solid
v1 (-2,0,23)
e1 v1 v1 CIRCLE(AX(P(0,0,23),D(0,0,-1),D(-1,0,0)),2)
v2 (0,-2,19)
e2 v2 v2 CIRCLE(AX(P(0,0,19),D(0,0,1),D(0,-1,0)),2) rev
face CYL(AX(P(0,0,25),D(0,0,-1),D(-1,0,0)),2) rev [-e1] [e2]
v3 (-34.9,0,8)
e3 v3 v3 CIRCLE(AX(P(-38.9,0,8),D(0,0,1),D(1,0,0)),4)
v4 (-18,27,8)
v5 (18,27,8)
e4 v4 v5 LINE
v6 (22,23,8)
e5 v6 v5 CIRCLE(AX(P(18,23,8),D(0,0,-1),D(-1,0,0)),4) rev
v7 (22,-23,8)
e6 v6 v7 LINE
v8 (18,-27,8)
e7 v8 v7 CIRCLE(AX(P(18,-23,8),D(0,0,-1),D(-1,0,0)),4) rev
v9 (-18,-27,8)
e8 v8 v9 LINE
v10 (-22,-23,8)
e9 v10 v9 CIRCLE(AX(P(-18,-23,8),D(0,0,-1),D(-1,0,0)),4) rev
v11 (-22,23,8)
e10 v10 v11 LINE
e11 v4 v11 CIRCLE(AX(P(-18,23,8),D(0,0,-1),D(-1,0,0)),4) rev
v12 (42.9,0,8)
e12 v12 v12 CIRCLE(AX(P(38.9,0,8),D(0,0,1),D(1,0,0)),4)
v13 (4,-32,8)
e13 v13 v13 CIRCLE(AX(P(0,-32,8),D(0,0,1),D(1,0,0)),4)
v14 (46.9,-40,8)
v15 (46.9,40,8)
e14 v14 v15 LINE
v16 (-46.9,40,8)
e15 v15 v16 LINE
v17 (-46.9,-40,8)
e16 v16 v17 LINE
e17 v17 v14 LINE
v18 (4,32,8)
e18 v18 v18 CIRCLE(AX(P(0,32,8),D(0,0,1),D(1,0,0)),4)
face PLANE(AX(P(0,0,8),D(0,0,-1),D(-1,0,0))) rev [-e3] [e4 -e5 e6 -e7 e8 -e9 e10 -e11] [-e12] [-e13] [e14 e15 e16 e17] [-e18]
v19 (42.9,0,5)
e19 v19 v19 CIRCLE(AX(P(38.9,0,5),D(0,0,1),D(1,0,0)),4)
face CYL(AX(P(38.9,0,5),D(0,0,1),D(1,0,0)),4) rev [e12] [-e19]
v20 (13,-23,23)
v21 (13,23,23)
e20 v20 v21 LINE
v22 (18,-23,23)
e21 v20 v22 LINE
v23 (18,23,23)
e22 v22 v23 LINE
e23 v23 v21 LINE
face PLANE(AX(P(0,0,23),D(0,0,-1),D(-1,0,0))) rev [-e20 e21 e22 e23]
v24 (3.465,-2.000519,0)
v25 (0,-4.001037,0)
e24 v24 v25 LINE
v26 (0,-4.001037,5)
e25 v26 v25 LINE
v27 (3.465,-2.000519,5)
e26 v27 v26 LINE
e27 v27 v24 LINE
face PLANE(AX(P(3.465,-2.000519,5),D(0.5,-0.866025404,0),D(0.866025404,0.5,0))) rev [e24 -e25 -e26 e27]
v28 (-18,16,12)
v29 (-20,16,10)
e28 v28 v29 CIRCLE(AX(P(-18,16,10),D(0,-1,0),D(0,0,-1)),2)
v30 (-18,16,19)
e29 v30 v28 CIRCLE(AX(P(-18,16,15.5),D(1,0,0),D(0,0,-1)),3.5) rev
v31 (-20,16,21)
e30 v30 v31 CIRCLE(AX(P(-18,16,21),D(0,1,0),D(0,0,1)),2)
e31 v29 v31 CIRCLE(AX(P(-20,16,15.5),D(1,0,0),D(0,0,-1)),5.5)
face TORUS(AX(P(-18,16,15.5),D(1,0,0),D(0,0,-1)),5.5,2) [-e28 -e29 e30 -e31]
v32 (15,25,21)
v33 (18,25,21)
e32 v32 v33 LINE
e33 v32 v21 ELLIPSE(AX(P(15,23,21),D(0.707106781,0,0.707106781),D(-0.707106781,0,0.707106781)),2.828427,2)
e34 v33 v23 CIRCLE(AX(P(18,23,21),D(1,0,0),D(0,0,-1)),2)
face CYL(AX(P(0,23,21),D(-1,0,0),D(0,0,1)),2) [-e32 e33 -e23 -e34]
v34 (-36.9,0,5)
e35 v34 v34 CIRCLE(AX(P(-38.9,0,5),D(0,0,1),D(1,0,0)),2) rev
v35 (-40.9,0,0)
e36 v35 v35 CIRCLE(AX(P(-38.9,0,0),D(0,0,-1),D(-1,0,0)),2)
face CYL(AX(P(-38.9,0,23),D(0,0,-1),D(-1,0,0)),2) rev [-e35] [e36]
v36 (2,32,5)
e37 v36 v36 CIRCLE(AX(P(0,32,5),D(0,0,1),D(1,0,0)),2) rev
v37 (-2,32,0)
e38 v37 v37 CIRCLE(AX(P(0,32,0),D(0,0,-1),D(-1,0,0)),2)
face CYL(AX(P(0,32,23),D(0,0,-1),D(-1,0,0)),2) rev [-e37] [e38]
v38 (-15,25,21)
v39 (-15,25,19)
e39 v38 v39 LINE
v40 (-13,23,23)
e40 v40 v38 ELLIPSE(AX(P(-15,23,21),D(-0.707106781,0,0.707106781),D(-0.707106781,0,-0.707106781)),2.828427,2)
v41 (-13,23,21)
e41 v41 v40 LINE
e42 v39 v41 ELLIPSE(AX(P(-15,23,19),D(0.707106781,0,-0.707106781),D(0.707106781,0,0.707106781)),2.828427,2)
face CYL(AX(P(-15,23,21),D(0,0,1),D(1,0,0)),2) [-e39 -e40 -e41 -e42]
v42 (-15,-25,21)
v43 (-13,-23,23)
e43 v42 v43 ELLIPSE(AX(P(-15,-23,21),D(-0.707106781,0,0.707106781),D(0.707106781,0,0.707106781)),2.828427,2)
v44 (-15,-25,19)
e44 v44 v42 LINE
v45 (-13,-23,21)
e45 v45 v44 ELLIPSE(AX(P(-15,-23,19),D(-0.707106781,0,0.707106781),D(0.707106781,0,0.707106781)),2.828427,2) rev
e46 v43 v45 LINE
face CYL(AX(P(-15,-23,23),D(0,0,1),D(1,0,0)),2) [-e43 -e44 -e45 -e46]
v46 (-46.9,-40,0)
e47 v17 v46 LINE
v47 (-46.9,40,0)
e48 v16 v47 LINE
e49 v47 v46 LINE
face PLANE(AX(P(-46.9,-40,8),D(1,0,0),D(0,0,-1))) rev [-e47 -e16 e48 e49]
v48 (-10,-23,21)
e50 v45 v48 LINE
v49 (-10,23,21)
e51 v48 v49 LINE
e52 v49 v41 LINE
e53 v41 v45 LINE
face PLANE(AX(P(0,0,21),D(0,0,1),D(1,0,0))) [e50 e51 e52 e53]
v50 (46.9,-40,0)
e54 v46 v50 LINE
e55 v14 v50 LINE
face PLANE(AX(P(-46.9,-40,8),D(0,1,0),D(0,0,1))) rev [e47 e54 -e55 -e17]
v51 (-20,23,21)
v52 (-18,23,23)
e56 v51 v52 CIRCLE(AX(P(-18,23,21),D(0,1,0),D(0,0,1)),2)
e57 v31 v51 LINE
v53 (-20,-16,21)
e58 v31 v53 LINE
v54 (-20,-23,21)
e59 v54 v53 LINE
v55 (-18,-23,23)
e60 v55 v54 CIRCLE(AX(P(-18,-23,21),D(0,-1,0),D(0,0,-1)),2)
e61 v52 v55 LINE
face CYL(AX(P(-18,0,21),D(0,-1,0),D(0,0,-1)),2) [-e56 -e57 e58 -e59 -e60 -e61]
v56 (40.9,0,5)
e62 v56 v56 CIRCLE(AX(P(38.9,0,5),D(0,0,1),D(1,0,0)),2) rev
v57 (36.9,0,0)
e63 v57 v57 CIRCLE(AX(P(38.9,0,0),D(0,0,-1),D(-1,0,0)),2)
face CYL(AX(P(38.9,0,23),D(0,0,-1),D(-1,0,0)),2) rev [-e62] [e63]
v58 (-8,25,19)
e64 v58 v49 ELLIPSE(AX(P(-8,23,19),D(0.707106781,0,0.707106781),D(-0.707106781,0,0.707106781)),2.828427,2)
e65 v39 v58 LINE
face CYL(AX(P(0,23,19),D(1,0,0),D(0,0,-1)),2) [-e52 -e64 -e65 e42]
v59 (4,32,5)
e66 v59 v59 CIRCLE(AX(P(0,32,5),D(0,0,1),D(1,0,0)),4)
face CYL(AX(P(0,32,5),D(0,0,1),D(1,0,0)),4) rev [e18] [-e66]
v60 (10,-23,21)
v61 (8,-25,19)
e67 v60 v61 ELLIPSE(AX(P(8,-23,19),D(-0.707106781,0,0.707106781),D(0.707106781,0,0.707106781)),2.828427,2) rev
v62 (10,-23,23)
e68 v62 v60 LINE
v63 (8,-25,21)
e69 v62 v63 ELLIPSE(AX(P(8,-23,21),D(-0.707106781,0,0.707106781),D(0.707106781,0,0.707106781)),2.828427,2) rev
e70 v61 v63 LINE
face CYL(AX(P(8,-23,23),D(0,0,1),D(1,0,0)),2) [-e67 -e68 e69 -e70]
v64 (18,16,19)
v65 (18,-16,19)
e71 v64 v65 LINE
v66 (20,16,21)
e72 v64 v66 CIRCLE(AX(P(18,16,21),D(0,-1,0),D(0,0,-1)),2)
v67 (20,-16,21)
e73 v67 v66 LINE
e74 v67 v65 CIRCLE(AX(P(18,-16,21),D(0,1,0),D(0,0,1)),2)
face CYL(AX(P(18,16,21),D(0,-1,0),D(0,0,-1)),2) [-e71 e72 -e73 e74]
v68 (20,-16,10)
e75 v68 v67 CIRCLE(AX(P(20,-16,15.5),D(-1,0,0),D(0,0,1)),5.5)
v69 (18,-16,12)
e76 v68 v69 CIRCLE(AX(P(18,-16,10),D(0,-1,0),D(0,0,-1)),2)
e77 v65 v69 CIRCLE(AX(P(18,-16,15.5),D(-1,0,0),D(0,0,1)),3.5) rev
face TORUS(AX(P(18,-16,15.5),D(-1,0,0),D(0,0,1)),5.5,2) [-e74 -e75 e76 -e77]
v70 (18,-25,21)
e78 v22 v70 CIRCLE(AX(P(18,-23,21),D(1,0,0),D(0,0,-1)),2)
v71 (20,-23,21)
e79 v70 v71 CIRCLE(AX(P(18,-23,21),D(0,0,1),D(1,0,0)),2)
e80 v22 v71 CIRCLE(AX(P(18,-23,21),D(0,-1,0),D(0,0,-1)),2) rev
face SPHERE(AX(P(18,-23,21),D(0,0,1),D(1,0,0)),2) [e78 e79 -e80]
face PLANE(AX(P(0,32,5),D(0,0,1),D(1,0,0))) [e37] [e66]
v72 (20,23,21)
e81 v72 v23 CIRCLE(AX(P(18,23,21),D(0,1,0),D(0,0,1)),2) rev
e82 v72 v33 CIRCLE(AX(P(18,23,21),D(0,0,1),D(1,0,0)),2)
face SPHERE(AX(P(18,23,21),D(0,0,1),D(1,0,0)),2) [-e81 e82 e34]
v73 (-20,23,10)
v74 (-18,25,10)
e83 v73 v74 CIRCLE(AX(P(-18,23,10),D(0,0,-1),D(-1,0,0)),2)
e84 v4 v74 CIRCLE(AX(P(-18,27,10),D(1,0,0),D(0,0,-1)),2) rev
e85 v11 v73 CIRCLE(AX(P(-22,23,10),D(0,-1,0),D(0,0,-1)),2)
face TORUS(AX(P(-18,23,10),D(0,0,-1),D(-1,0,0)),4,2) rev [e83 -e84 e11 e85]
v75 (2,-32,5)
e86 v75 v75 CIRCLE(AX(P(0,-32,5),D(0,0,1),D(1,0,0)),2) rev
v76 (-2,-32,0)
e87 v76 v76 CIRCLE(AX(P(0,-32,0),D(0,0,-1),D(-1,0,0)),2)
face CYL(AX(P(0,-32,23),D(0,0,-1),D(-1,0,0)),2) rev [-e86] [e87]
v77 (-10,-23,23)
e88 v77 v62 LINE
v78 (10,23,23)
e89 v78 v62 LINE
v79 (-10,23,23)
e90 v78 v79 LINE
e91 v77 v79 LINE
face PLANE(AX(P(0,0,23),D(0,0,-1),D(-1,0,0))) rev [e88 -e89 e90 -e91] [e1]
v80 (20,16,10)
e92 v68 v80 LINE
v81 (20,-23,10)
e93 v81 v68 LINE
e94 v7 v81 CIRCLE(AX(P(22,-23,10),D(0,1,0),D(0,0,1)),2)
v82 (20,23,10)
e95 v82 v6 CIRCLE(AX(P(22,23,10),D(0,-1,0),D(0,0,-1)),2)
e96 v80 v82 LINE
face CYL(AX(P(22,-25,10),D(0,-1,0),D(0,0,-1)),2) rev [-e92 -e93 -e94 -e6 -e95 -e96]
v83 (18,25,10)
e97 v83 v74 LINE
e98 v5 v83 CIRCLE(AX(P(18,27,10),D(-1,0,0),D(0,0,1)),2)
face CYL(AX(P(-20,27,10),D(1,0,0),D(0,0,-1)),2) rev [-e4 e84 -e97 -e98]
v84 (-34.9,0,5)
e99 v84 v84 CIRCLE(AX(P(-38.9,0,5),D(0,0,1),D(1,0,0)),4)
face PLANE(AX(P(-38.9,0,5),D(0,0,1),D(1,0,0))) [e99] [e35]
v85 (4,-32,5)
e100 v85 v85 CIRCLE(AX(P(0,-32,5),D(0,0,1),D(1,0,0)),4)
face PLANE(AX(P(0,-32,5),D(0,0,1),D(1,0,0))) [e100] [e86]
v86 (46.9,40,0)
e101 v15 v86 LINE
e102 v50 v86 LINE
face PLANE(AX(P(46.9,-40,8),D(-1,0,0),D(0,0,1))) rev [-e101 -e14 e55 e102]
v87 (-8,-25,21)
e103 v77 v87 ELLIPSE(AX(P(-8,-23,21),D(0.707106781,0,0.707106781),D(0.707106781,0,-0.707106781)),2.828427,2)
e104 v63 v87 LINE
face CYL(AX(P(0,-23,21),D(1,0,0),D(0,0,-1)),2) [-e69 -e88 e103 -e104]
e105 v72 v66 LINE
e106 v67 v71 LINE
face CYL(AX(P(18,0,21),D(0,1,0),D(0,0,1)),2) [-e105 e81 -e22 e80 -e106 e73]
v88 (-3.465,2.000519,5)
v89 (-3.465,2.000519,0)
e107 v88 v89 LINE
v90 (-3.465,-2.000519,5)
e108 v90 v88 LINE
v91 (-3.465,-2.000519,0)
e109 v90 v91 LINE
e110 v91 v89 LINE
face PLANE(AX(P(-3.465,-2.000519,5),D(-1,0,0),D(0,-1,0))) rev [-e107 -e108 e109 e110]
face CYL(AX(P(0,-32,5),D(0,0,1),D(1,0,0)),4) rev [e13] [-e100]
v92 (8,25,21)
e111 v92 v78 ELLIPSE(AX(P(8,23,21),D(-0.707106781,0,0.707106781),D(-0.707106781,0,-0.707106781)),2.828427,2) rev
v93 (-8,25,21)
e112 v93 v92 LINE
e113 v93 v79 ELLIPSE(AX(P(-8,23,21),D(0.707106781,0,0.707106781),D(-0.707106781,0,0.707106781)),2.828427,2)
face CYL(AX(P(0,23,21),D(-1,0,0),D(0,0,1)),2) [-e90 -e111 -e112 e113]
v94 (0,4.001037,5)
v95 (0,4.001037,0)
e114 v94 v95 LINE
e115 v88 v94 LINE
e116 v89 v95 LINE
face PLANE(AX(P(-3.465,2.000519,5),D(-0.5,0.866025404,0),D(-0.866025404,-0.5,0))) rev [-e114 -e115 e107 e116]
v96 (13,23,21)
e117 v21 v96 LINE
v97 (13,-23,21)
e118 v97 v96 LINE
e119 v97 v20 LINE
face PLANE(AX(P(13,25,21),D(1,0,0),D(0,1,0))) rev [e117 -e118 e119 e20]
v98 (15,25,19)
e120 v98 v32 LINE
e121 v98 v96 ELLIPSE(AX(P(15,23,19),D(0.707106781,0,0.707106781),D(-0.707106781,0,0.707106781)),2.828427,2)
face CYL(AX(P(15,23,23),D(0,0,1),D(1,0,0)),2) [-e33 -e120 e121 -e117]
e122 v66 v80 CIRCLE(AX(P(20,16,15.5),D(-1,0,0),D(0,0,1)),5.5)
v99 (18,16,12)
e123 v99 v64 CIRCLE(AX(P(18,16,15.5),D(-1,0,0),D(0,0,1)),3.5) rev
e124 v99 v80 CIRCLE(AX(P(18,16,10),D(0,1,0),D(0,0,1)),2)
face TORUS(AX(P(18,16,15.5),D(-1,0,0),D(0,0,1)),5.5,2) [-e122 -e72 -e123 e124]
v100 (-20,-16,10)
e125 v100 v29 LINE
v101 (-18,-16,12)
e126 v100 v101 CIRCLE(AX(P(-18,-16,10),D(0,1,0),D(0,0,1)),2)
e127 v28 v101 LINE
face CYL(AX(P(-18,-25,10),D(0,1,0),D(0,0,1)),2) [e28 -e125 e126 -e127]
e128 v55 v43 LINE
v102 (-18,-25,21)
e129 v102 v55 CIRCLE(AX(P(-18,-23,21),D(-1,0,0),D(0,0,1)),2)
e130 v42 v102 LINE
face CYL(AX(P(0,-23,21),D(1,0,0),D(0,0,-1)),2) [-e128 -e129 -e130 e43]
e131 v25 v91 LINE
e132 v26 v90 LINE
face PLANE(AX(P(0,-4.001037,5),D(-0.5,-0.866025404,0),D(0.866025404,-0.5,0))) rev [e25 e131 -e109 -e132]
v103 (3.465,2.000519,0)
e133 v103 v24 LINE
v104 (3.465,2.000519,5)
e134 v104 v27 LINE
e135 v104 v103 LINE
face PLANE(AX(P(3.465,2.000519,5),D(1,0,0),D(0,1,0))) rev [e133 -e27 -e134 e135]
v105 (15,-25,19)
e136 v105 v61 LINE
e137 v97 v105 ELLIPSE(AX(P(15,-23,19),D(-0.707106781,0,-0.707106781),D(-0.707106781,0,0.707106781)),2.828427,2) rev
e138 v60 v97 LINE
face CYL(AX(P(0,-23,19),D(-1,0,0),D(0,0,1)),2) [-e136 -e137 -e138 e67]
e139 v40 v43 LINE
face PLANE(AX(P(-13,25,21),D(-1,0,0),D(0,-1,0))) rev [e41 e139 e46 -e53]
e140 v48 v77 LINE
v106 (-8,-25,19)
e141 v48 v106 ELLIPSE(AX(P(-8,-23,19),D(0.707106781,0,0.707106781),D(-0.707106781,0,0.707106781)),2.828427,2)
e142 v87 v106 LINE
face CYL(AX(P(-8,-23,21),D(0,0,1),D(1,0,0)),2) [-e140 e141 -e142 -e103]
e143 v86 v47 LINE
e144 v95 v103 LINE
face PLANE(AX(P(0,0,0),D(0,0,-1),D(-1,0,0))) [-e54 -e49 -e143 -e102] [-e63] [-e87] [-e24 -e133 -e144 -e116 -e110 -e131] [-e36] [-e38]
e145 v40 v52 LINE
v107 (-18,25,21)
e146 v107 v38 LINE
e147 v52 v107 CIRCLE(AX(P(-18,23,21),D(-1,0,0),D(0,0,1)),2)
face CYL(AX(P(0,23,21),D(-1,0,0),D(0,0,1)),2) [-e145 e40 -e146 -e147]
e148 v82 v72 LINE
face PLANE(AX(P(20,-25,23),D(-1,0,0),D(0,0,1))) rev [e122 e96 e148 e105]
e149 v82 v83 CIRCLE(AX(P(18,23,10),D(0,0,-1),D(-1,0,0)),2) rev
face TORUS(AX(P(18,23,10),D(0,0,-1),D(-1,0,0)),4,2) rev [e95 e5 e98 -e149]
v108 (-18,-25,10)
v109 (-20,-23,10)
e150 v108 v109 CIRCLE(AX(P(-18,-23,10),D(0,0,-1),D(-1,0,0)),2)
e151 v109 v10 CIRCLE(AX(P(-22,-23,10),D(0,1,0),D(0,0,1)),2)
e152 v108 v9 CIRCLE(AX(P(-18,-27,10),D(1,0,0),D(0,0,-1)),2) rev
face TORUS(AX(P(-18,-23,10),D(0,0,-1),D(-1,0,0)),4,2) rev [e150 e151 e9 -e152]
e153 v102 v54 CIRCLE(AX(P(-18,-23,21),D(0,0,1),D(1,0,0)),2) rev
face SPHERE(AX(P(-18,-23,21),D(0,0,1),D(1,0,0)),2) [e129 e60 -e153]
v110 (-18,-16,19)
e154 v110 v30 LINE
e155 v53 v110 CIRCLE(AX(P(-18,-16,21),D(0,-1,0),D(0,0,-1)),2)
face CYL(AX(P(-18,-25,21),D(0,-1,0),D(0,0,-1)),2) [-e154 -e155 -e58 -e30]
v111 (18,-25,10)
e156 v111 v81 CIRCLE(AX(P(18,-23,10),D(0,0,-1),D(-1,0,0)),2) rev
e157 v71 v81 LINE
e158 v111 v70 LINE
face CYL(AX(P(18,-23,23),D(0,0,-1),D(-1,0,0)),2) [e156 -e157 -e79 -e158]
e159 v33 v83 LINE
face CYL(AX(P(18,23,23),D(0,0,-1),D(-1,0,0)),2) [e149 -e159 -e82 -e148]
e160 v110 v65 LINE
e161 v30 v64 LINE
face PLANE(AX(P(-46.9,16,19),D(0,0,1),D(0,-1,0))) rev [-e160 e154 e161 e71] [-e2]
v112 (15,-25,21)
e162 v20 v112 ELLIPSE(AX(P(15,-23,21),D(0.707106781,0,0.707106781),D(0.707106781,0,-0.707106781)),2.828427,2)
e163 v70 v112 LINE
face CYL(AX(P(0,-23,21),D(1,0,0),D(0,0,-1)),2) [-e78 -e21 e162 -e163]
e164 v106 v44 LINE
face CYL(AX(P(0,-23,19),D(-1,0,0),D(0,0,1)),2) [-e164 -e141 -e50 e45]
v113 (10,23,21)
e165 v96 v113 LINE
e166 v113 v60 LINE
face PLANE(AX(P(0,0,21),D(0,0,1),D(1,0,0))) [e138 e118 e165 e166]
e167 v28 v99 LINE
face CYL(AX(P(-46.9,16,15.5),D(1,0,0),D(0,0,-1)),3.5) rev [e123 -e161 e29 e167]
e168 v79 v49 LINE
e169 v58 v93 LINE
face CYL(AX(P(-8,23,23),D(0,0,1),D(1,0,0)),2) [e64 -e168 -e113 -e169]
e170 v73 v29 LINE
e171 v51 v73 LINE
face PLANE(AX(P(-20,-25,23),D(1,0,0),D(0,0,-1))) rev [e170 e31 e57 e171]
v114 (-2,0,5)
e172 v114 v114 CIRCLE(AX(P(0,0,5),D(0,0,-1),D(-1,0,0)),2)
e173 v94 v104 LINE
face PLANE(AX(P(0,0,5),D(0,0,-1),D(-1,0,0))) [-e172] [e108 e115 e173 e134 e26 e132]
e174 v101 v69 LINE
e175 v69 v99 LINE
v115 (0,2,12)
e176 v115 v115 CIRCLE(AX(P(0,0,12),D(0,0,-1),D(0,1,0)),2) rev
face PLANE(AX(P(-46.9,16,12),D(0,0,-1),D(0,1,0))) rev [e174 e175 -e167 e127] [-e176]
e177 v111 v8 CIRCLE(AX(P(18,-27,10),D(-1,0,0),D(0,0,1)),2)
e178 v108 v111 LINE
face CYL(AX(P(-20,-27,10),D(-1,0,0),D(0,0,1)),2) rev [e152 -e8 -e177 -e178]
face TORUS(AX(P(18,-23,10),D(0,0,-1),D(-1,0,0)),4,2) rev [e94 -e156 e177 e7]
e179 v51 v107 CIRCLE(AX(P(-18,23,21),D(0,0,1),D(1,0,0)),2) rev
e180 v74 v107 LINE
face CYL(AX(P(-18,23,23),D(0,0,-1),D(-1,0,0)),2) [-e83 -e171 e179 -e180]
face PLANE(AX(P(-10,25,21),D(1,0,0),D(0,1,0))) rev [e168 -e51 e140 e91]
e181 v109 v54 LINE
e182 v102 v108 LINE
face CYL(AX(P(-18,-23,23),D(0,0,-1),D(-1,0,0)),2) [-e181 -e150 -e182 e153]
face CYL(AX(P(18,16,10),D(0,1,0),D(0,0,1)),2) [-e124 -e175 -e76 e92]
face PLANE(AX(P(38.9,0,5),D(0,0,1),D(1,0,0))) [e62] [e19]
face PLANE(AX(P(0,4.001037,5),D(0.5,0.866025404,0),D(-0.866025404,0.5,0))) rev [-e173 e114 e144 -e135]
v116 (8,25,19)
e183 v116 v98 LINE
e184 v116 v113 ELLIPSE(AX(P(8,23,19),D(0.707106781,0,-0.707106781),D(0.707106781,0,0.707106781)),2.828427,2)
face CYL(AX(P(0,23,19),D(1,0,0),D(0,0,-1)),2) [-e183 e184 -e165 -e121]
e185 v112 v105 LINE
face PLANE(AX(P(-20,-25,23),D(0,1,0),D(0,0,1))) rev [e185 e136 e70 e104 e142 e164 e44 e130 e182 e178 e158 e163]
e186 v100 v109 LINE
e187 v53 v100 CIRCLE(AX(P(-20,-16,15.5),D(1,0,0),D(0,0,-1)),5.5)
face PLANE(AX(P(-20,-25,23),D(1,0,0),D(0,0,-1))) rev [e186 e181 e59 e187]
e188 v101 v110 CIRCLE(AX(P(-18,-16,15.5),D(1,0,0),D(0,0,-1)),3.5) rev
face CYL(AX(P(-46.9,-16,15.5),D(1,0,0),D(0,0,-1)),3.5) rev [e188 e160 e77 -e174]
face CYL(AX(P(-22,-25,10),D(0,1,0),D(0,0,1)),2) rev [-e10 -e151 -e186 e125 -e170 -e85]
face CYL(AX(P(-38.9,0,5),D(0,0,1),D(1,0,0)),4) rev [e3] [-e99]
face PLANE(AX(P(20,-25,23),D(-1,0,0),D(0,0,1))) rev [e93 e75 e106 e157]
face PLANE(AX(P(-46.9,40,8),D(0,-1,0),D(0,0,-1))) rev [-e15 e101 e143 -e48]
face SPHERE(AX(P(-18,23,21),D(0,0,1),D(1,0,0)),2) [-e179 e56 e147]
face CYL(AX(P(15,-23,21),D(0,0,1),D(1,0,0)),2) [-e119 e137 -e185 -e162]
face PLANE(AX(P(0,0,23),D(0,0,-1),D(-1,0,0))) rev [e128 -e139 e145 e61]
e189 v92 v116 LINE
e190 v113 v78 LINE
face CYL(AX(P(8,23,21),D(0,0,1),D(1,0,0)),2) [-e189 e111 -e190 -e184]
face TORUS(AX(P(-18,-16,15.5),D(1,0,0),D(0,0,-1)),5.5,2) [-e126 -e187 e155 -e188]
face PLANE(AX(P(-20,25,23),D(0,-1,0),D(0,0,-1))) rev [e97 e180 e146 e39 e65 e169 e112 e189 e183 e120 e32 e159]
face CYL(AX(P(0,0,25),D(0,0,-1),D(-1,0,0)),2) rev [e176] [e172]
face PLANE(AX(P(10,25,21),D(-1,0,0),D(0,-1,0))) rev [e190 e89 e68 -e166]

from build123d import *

# Parameters (mm, degrees)
SKETCH1_W           = 93.8
SKETCH1_H           = 80
BOSS_EXTRUDE1_DEPTH = 8
SKETCH2_W           = 40
SKETCH2_H           = 50
BOSS_EXTRUDE2_DEPTH = 15
SKETCH4_R           = 2
CUT_EXTRUDE2_DEPTH  = 66.792172787
CUT_EXTRUDE3_DEPTH  = 5
SKETCH7_R           = 2
CUT_EXTRUDE4_DEPTH  = 20
SKETCH8_R           = 4
CUT_EXTRUDE5_DEPTH  = 3
CUT_EXTRUDE6_DEPTH  = 82.268751682
SKETCH10_W          = 3
SKETCH10_H          = 50
CUT_EXTRUDE7_DEPTH  = 2
FILLET2_R           = 2


with BuildPart() as part:
    # Sketch1 → Boss-Extrude1 (new body)
    with BuildSketch(Plane.XY):
        Rectangle(SKETCH1_W, SKETCH1_H)
    extrude(amount=BOSS_EXTRUDE1_DEPTH)

    # Sketch2 → Boss-Extrude2 (add)
    with BuildSketch(Plane.XY.offset(8)):
        Rectangle(SKETCH2_W, SKETCH2_H)
    extrude(amount=BOSS_EXTRUDE2_DEPTH)

    # Sketch4 → Cut-Extrude2 (cut, through all)
    with BuildSketch(Plane(origin=(0, 0, 0), x_dir=(-1, 0, 0), z_dir=(0, 0, -1))):
        with Locations((0, -32)):
            Circle(SKETCH4_R)
        with Locations((0, 32)):
            Circle(SKETCH4_R)
        with Locations((38.9, 0)):
            Circle(SKETCH4_R)
        with Locations((-38.9, 0)):
            Circle(SKETCH4_R)
    extrude(amount=-CUT_EXTRUDE2_DEPTH, mode=Mode.SUBTRACT)

    # Sketch5 → Cut-Extrude3 (cut)
    with BuildSketch(Plane(origin=(0, 0, 0), x_dir=(-1, 0, 0), z_dir=(0, 0, -1))):
        Polygon((0, 4.001037365), (-3.465, 2.000518683), (-3.465, -2.000518683), (0, -4.001037365), (3.465, -2.000518683), (3.465, 2.000518683), align=None)
    extrude(amount=-CUT_EXTRUDE3_DEPTH, mode=Mode.SUBTRACT)

    # Sketch7 → Cut-Extrude4 (cut)
    with BuildSketch(Plane(origin=(0, 0, 5), x_dir=(-1, 0, 0), z_dir=(0, 0, -1))):
        Circle(SKETCH7_R)
    extrude(amount=-CUT_EXTRUDE4_DEPTH, mode=Mode.SUBTRACT)

    # Sketch8 → Cut-Extrude5 (cut)
    with BuildSketch(Plane.XY.offset(8)):
        with Locations((0, 32)):
            Circle(SKETCH8_R)
        with Locations((38.9, 0)):
            Circle(SKETCH8_R)
        with Locations((0, -32)):
            Circle(SKETCH8_R)
        with Locations((-38.9, 0)):
            Circle(SKETCH8_R)
    extrude(amount=-CUT_EXTRUDE5_DEPTH, mode=Mode.SUBTRACT)

    # Sketch9 → Cut-Extrude6 (cut, through all)
    with BuildSketch(Plane(origin=(20, 0, 0), x_dir=(0, 0, -1), z_dir=(1, 0, 0))):
        with BuildLine():
            Line((-12, 16), (-12, -16))
            ThreePointArc((-12, -16), (-15.5, -19.5), (-19, -16))
            Line((-19, -16), (-19, 16))
            ThreePointArc((-19, 16), (-15.5, 19.5), (-12, 16))
        make_face()
    extrude(amount=-CUT_EXTRUDE6_DEPTH, mode=Mode.SUBTRACT)

    # Sketch10 → Cut-Extrude7 (cut)
    with BuildSketch(Plane.XY.offset(23)):
        with Locations((-11.5, 0)):
            Rectangle(SKETCH10_W, SKETCH10_H)
        with Locations((11.5, 0)):
            Rectangle(SKETCH10_W, SKETCH10_H)
    extrude(amount=-CUT_EXTRUDE7_DEPTH, mode=Mode.SUBTRACT)

    # Fillet2
    fillet2_edges = [part.edges().sort_by_distance(p)[0] for p in [
        (20, 0, 23),
        (20, 0, 8),
        (20, -19.5, 15.5),
        (20, 0, 12),
        (20, 19.5, 15.5),
        (20, 0, 19),
        (0, 25, 8),
        (20, 25, 15.5),
        (16.5, 25, 23),
        (13, 25, 22),
        (11.5, 25, 21),
        (10, 25, 22),
        (0, 25, 23),
        (-10, 25, 22),
        (-11.5, 25, 21),
        (-13, 25, 22),
        (-16.5, 25, 23),
        (-20, 25, 15.5),
        (-20, 0, 23),
        (-20, 0, 8),
        (-20, -19.5, 15.5),
        (-20, 0, 19),
        (-20, 19.5, 15.5),
        (-20, 0, 12),
        (-10, -25, 22),
        (0, -25, 23),
        (10, -25, 22),
        (11.5, -25, 21),
        (13, -25, 22),
        (16.5, -25, 23),
        (20, -25, 15.5),
        (0, -25, 8),
        (-20, -25, 15.5),
        (-16.5, -25, 23),
        (-13, -25, 22),
        (-11.5, -25, 21),
    ]]
    fillet(fillet2_edges, radius=FILLET2_R - 0.0001)  # a hair under: the kernel refuses the full size


solid = part.part
